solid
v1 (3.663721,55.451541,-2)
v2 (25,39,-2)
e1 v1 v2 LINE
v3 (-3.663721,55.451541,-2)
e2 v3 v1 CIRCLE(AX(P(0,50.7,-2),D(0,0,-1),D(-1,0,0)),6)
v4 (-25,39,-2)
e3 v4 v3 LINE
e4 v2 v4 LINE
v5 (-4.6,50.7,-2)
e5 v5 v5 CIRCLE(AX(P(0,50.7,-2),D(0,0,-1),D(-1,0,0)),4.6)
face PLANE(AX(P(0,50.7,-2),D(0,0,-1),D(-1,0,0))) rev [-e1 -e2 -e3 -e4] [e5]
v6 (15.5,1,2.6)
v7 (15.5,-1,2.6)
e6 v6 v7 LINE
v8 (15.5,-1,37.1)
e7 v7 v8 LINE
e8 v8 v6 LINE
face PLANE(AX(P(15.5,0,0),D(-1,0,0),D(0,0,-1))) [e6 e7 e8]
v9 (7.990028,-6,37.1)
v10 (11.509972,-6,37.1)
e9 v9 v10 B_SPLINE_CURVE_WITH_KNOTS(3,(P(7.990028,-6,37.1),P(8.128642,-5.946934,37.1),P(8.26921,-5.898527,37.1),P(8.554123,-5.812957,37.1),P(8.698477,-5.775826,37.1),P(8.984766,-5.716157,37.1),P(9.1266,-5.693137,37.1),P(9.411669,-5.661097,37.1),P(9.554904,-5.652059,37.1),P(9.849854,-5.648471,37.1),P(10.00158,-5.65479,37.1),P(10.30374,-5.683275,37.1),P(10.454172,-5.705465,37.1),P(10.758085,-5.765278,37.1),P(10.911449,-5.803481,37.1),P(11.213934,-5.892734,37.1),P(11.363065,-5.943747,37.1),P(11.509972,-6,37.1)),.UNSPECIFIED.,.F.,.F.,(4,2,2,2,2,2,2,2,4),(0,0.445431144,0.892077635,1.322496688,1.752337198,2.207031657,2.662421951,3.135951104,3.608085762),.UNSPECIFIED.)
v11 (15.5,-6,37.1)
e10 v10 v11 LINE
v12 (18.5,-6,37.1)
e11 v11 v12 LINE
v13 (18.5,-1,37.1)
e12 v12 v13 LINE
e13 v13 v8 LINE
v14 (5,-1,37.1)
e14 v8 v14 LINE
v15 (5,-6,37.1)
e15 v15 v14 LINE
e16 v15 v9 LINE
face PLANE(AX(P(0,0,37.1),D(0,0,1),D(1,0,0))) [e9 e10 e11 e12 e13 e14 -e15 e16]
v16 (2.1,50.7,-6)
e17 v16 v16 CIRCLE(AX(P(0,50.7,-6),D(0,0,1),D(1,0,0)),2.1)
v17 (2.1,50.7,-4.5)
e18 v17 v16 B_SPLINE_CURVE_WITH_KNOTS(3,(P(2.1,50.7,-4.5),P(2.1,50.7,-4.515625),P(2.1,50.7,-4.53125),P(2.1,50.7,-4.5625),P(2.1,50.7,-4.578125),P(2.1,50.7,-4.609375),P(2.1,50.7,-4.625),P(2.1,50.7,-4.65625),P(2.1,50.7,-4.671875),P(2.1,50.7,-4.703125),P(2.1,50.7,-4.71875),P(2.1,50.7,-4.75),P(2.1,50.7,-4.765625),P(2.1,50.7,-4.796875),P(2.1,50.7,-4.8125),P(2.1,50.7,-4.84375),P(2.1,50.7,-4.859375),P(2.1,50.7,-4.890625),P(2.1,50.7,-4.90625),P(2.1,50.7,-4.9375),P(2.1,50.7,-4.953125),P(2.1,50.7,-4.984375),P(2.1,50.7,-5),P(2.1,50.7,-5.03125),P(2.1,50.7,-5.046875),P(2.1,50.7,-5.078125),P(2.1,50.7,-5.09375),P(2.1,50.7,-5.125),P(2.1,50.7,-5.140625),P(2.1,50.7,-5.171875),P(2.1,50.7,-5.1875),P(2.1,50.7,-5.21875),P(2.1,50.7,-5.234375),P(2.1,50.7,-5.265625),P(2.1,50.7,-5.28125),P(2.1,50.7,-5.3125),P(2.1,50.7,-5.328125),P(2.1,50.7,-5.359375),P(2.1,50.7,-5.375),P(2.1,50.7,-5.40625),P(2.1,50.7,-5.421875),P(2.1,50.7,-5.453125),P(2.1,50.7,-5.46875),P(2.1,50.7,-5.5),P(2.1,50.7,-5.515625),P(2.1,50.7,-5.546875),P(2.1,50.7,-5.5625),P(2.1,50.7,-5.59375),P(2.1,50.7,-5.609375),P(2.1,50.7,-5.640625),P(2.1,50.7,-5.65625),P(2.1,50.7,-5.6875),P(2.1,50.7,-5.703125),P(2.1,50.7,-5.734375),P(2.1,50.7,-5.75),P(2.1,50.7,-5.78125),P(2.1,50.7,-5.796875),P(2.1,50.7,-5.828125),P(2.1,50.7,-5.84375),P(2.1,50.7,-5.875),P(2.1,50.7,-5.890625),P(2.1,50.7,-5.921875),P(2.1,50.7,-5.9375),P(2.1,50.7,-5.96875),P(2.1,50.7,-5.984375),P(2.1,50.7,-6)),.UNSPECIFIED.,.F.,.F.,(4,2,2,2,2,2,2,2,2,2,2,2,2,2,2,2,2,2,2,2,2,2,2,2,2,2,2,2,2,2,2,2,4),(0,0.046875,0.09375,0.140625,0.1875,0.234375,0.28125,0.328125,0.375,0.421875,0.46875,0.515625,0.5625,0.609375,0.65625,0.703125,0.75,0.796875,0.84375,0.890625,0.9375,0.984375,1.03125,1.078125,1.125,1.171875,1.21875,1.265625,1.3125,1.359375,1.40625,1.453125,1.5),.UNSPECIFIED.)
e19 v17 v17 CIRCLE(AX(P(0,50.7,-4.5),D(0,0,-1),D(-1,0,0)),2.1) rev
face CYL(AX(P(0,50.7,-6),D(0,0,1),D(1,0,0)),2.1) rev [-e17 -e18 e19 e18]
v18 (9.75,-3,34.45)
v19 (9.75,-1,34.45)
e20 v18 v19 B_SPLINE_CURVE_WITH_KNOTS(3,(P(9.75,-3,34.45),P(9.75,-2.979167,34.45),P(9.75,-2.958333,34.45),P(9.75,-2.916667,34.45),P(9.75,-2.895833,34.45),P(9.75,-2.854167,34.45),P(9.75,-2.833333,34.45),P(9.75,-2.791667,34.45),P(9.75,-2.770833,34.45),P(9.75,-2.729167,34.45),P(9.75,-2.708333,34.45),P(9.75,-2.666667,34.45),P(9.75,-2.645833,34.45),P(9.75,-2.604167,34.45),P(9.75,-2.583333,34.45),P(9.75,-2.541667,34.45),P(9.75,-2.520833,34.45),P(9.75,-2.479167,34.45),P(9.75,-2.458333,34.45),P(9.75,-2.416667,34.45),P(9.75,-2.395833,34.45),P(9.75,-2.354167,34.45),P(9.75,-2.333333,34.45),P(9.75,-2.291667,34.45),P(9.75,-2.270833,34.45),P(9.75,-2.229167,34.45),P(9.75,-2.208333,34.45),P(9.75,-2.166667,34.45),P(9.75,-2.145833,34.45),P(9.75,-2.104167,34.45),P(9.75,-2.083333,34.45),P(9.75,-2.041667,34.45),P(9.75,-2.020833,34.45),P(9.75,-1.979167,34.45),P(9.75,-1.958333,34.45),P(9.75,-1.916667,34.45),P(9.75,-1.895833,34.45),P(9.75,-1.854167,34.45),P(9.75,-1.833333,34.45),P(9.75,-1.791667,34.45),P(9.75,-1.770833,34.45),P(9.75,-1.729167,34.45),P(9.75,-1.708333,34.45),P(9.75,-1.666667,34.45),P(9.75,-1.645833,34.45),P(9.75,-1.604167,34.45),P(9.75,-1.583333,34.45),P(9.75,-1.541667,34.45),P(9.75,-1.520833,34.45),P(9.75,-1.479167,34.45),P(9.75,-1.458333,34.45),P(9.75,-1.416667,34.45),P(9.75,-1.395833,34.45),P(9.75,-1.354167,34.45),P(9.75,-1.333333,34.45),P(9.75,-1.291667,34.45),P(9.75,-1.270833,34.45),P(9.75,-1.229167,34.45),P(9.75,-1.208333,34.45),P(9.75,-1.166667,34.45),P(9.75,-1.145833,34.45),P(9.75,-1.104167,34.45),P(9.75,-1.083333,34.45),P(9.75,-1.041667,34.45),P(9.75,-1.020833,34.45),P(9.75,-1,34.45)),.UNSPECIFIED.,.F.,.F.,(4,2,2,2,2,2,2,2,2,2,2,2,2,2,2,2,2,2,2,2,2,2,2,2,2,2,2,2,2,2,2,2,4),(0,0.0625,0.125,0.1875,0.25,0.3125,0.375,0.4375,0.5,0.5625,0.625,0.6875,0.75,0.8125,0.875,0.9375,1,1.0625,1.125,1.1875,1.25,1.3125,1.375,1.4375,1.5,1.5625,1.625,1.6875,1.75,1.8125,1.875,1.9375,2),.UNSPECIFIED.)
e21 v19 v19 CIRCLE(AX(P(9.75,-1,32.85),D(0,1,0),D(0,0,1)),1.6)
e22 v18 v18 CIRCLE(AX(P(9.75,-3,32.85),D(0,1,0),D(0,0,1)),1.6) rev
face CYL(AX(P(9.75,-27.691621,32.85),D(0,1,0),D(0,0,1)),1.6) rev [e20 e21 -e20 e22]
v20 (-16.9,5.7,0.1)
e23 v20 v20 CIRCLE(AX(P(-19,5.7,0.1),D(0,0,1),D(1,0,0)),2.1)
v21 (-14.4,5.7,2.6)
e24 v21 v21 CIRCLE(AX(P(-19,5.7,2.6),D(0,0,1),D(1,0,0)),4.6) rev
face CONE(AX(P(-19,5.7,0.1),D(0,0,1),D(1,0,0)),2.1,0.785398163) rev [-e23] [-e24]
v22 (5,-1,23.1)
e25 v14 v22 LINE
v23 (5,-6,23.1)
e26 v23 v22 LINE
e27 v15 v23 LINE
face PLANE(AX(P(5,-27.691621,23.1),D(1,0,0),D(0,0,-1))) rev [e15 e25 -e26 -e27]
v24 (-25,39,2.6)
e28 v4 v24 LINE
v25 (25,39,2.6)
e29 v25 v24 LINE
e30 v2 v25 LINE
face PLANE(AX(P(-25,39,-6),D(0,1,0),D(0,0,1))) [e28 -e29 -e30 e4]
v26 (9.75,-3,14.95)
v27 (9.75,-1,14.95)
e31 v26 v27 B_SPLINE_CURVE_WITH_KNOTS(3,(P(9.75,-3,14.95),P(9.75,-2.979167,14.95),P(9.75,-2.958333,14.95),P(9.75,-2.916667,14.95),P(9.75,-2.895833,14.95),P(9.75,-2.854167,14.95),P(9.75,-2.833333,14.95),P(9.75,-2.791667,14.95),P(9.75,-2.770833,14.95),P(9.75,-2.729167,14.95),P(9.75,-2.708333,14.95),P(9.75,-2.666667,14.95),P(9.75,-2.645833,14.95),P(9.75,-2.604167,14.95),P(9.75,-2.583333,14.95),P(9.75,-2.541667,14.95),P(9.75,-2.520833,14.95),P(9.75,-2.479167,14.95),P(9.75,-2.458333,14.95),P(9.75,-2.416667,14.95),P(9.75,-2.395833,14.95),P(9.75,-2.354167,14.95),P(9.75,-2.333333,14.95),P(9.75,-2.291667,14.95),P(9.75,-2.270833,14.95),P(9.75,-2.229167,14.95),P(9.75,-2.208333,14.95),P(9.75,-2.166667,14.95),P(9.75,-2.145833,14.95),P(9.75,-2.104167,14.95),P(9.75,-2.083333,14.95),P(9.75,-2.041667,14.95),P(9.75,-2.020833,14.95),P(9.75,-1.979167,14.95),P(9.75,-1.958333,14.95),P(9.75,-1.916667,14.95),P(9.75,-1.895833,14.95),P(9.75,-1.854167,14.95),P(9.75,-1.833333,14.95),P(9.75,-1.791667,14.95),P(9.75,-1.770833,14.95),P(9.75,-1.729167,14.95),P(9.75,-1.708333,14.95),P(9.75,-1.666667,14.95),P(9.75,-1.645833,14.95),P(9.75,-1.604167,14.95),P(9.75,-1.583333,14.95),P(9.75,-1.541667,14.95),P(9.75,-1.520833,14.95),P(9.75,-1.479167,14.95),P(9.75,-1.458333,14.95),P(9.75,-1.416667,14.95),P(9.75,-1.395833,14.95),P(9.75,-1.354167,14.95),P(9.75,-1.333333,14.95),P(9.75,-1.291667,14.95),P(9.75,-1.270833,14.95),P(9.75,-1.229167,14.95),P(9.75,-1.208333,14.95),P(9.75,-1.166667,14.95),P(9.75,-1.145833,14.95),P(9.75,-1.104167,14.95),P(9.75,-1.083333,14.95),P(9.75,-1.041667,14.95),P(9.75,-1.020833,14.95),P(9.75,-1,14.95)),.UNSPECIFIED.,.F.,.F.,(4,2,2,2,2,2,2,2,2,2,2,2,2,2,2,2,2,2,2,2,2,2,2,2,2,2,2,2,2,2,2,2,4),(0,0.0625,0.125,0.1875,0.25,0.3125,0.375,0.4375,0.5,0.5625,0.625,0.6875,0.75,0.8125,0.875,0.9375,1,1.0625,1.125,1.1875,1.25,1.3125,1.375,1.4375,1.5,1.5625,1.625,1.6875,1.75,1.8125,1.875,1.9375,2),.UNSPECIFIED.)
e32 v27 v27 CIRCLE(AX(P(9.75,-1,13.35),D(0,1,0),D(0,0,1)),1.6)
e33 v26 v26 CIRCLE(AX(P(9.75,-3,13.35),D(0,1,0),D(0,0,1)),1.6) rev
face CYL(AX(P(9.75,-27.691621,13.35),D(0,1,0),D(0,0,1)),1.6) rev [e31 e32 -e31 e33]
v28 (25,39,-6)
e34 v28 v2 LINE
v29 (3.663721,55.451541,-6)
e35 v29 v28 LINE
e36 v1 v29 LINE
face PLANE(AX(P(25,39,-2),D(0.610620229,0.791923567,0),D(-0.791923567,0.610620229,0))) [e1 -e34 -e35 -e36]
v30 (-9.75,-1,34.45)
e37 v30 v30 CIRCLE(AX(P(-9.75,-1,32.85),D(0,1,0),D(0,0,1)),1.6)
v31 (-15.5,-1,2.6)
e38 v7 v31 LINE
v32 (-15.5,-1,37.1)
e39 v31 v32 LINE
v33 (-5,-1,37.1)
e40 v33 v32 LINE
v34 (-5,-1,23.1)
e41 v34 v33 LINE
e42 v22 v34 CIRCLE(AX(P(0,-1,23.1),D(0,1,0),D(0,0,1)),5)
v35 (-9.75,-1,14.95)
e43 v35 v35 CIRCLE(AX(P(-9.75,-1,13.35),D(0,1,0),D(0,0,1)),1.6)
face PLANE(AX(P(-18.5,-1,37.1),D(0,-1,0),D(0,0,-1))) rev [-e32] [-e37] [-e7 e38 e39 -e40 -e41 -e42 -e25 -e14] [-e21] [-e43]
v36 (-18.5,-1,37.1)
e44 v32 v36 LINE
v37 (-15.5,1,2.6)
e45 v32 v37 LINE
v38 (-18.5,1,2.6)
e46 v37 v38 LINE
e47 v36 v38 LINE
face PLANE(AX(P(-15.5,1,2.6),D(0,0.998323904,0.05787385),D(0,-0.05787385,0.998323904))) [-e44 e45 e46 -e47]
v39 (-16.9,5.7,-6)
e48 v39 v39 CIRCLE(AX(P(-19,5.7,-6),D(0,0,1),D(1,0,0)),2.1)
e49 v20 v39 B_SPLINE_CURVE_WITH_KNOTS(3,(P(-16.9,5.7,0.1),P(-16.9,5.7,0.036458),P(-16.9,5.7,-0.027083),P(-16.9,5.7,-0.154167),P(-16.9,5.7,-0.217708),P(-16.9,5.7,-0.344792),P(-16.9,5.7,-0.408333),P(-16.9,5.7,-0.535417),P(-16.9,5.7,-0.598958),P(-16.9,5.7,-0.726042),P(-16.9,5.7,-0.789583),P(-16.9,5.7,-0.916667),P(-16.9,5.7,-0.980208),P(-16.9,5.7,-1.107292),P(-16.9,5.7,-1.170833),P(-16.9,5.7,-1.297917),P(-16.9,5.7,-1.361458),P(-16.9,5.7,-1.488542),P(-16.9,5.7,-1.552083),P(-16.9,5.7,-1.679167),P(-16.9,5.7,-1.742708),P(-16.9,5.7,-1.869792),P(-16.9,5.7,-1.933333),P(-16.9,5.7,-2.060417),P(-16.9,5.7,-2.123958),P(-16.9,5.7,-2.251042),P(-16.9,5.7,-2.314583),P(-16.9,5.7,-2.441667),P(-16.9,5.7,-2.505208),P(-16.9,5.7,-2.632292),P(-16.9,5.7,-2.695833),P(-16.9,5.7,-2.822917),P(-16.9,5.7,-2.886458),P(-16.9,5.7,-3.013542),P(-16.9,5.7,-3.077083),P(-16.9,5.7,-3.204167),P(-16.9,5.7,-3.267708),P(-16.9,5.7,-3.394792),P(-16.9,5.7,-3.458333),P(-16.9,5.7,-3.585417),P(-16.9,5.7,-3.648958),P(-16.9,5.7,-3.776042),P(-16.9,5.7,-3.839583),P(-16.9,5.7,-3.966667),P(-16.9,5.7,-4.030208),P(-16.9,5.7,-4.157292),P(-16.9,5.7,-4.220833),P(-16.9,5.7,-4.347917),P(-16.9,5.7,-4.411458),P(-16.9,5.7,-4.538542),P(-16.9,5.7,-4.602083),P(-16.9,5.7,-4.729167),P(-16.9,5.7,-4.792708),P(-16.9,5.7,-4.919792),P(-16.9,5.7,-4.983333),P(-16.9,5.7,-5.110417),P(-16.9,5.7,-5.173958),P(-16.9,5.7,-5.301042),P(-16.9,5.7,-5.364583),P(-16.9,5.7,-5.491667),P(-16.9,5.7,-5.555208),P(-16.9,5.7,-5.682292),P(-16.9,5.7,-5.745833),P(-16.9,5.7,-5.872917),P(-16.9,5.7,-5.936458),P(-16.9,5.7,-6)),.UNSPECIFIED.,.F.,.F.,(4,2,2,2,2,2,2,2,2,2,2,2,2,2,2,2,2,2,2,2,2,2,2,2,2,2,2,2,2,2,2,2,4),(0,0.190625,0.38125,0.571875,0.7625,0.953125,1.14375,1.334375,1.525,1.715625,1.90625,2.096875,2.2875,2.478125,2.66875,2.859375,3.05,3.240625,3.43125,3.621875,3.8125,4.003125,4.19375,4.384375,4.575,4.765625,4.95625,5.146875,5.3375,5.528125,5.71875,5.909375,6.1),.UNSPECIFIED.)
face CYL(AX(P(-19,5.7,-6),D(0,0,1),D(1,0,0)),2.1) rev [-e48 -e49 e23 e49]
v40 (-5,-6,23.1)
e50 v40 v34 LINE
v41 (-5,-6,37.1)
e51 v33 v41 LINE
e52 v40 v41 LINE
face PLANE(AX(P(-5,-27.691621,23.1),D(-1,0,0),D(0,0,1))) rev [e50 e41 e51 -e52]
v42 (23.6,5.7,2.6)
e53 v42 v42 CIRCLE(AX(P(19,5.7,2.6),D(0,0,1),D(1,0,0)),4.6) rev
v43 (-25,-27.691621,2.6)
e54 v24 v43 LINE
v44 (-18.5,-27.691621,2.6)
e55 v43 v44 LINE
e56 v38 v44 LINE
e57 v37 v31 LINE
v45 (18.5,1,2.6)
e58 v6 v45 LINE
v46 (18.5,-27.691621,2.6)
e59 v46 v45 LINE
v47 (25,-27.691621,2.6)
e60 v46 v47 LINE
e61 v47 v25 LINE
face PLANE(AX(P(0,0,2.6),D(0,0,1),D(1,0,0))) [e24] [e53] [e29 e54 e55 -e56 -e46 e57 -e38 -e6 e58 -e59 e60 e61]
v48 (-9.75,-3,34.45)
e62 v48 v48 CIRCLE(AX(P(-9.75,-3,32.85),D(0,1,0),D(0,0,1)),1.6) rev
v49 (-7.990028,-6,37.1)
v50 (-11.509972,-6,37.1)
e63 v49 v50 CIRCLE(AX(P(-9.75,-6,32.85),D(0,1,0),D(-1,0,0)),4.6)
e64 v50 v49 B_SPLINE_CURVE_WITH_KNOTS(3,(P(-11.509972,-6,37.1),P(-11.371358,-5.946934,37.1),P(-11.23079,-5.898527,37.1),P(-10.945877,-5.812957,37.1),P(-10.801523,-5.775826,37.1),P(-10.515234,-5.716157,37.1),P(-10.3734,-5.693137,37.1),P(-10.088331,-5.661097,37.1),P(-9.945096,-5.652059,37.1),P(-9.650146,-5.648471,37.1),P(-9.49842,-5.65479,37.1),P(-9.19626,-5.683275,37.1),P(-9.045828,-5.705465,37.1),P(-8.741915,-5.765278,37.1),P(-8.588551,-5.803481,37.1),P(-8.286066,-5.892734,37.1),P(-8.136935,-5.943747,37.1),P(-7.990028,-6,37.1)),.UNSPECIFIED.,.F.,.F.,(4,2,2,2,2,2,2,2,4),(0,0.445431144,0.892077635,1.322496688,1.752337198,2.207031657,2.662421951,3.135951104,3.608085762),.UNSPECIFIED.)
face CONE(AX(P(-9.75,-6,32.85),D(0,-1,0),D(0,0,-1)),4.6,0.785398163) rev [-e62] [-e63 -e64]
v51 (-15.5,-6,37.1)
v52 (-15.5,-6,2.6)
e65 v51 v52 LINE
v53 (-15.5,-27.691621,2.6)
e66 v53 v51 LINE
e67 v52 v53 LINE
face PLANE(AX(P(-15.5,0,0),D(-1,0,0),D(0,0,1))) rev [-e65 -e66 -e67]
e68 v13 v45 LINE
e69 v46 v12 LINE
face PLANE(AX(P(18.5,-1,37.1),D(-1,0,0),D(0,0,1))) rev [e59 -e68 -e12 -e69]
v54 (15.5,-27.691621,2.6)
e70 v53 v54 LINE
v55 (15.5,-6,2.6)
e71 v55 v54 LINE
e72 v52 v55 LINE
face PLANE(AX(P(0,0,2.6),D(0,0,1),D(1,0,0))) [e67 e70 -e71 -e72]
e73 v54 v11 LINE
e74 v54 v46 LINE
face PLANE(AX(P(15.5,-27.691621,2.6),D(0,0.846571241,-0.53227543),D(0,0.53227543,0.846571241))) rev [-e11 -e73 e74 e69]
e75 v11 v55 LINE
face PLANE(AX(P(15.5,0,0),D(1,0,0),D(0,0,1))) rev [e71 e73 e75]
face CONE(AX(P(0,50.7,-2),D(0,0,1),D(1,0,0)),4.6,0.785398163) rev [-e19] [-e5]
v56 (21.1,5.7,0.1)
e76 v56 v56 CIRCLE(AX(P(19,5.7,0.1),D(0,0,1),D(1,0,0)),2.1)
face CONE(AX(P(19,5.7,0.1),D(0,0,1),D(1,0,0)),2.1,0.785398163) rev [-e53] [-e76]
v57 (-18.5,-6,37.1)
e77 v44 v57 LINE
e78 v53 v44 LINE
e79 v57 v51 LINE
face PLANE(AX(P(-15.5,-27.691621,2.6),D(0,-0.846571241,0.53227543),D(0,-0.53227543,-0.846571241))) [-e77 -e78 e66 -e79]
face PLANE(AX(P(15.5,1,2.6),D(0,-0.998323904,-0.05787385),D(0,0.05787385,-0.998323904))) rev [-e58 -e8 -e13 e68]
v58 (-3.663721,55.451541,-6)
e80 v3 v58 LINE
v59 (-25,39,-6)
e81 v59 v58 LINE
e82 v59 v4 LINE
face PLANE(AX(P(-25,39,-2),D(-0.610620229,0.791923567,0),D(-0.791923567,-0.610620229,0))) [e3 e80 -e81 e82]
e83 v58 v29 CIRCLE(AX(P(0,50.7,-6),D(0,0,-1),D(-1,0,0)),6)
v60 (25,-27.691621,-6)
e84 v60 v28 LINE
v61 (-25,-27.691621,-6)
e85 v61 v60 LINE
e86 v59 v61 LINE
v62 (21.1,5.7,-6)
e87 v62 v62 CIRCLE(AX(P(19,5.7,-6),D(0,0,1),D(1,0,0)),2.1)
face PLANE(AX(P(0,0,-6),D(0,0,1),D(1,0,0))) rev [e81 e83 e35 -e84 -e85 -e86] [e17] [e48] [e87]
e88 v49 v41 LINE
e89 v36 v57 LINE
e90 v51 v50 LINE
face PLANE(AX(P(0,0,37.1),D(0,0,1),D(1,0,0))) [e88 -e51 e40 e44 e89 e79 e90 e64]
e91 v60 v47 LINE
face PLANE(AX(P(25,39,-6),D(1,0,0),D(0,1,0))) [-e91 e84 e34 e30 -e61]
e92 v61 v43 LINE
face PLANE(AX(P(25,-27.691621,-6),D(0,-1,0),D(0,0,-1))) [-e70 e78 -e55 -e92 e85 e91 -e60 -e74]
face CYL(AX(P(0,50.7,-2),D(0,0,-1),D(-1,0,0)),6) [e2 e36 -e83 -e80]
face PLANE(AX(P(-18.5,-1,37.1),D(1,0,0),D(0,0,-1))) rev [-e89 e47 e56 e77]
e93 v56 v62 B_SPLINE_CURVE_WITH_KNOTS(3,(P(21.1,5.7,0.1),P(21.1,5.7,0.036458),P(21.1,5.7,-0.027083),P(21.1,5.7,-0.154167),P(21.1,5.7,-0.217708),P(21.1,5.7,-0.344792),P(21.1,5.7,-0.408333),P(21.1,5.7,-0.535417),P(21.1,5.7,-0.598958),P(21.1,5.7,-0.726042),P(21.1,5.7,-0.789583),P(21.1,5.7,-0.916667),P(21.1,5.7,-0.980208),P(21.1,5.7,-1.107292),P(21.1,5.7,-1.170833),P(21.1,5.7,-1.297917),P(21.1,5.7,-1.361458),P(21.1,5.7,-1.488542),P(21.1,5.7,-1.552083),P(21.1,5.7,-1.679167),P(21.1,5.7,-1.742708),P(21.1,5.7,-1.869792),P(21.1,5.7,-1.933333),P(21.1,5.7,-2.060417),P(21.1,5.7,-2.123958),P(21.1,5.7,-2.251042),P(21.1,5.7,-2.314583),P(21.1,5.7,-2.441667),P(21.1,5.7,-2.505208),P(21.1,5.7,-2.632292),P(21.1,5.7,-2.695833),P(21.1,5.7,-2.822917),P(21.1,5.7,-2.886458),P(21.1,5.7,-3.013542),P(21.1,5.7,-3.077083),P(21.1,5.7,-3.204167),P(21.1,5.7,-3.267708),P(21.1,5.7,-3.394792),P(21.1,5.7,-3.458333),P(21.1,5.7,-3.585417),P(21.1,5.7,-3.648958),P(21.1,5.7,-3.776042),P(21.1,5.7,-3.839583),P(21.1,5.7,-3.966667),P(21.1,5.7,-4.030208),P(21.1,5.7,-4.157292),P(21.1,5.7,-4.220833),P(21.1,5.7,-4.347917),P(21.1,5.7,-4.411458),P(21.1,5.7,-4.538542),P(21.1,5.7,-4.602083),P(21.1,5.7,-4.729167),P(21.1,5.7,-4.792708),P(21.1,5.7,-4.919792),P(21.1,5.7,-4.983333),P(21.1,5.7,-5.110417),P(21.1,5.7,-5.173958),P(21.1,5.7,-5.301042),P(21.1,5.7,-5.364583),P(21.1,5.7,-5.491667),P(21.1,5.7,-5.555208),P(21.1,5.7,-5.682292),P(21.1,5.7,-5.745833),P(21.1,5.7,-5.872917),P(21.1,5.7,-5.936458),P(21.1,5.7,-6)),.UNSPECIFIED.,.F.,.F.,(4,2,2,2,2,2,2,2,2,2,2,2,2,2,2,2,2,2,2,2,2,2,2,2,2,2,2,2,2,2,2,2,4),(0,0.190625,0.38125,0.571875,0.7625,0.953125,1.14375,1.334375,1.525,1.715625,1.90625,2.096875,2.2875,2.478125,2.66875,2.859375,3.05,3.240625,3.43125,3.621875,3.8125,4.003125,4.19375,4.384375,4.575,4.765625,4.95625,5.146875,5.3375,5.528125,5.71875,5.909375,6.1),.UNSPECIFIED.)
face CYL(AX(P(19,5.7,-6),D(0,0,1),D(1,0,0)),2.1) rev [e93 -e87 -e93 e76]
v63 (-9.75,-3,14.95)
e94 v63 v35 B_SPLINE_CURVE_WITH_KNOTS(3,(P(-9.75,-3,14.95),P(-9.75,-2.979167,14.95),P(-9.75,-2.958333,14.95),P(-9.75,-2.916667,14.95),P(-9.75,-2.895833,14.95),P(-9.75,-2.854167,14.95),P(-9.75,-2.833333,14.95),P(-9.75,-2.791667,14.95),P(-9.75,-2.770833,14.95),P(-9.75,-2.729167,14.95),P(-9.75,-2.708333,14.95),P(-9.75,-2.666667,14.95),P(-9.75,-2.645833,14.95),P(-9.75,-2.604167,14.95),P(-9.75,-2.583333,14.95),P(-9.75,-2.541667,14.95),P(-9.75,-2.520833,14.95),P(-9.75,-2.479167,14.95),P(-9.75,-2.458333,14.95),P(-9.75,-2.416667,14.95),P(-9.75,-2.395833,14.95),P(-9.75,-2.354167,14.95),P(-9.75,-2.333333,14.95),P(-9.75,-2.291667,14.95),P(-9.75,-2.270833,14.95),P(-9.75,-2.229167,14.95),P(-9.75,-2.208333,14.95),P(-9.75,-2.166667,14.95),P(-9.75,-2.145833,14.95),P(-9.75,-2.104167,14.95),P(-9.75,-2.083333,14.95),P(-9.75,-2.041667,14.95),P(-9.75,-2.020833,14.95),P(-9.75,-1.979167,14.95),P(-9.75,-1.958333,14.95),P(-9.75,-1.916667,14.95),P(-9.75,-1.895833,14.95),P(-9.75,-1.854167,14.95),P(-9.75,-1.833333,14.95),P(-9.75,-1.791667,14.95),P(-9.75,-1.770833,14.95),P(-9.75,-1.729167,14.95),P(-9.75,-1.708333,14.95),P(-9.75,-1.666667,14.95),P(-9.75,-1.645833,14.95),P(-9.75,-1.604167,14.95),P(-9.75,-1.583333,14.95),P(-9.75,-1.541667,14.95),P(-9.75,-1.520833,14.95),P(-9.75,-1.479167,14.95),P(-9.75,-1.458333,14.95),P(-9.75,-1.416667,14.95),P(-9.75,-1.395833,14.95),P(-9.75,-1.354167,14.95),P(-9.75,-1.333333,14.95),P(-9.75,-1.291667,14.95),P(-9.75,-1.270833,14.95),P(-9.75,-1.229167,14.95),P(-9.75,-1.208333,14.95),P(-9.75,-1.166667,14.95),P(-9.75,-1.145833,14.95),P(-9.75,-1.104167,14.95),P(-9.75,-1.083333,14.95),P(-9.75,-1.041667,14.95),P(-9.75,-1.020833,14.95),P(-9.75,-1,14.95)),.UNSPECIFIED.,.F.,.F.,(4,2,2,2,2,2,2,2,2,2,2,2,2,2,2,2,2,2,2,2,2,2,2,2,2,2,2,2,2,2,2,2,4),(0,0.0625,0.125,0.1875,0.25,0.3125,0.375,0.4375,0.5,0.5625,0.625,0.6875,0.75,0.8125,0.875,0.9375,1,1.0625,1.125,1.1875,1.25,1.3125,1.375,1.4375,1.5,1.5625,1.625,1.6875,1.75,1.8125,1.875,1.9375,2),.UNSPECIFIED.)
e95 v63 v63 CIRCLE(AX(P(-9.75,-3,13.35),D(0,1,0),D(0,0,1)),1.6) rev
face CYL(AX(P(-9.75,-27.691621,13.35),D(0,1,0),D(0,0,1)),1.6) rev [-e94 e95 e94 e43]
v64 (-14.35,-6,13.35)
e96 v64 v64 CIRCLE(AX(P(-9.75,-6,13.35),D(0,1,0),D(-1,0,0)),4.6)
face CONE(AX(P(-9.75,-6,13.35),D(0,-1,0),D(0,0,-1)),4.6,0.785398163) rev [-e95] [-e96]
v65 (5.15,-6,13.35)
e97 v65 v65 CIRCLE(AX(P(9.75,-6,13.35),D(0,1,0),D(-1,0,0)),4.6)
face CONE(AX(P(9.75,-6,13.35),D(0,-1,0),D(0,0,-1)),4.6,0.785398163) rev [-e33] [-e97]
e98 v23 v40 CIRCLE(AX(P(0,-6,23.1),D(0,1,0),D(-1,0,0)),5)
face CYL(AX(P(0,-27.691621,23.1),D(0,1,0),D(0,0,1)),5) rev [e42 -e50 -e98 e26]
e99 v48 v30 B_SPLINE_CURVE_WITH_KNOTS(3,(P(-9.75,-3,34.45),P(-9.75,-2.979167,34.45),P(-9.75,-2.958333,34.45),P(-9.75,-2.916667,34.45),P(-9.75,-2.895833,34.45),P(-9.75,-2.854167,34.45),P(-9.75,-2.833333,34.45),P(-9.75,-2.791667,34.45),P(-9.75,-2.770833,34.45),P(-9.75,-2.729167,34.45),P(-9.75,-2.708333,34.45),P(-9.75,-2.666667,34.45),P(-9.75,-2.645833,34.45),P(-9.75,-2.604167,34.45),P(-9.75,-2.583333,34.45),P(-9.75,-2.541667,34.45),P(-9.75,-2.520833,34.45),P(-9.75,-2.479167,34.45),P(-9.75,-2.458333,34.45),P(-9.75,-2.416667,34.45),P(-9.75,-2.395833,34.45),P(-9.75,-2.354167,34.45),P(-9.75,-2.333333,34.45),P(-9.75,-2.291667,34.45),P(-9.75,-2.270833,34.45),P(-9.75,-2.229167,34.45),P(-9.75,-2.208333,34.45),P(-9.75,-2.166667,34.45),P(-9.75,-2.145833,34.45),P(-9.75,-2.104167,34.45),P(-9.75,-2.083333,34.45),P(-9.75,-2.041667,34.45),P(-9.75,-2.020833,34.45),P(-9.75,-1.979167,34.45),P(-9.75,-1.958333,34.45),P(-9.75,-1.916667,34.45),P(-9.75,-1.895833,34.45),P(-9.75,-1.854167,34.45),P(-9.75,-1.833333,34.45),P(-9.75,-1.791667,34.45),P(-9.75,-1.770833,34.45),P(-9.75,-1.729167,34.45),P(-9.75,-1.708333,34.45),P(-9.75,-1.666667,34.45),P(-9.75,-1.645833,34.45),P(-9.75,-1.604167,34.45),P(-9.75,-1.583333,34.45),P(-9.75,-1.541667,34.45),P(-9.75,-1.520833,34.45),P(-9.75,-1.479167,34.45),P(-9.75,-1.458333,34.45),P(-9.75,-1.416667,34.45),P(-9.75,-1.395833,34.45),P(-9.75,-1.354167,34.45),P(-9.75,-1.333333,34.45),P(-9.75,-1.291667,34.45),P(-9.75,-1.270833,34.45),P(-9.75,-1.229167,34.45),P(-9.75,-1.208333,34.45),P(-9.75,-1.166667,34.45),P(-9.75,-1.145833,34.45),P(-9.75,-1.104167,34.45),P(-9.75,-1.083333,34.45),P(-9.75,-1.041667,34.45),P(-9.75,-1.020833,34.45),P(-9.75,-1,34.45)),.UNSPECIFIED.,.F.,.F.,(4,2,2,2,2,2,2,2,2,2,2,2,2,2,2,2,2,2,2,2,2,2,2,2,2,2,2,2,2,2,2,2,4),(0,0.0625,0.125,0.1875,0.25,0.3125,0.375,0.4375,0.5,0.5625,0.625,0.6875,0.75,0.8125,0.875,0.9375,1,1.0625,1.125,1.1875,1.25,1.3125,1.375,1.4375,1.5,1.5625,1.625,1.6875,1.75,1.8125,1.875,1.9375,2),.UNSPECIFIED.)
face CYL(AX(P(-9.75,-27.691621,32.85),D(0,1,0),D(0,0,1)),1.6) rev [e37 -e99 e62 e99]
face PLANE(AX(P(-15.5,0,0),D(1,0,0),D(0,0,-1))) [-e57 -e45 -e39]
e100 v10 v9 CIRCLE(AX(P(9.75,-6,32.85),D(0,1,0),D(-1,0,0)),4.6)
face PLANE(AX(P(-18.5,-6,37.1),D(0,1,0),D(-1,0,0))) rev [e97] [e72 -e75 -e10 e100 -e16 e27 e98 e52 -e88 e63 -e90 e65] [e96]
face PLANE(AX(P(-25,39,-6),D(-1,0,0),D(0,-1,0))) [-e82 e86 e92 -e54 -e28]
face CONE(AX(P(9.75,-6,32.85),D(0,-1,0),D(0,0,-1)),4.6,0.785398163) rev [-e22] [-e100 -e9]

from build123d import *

# Parameters (mm, degrees)
BOSS_EXTRUDE1_DEPTH      = 2.6
BOSS_EXTRUDE1_DEPTH_BACK = 6
SKETCH3_W                = 50
SKETCH3_H                = 66.691620804
BOSS_EXTRUDE2_DEPTH      = 4
SKETCH8_R                = 2.1
CUT_EXTRUDE4_DEPTH       = 63.560770456
CHAMFER1_SIZE            = 2.5
SKETCH9_W                = 37
SKETCH9_H                = 5
BOSS_EXTRUDE3_DEPTH      = 34.5
SKETCH10_R               = 1.6
CUT_EXTRUDE5_DEPTH       = 74.011642907
BOSS_EXTRUDE4_DEPTH      = 3
CHAMFER2_SIZE            = 3


with BuildPart() as part:
    # Sketch3 → Boss-Extrude1 (new, two sides: drawn at the far end of the back side and taken through both)
    with BuildSketch(Plane.XY.offset(-BOSS_EXTRUDE1_DEPTH_BACK)):
        with Locations((0, 5.654189598)):
            Rectangle(SKETCH3_W, SKETCH3_H)
    extrude(amount=BOSS_EXTRUDE1_DEPTH + BOSS_EXTRUDE1_DEPTH_BACK)

    # Sketch7 → Boss-Extrude2 (add)
    with BuildSketch(Plane(origin=(0, 0, -6), x_dir=(-1, 0, 0), z_dir=(0, 0, -1))):
        with BuildLine():
            Line((-25, 39), (-3.663721376, 55.451541401))
            ThreePointArc((-3.663721376, 55.451541401), (0, 56.7), (3.663721376, 55.451541401))
            Line((3.663721376, 55.451541401), (25, 39))
            Line((25, 39), (-25, 39))
        make_face()
    extrude(amount=-BOSS_EXTRUDE2_DEPTH)

    # Sketch8 → Cut-Extrude4 (cut, through all)
    with BuildSketch(Plane.XY.offset(2.6)):
        with Locations((-19, 5.7)):
            Circle(SKETCH8_R)
        with Locations((19, 5.7)):
            Circle(SKETCH8_R)
        with Locations((0, 50.7)):
            Circle(SKETCH8_R)
    extrude(amount=-CUT_EXTRUDE4_DEPTH, mode=Mode.SUBTRACT)

    # Chamfer1
    chamfer1_edges = [part.edges().sort_by_distance(p)[0] for p in [
        (-21.1, 5.7, 2.6),
        (16.9, 5.7, 2.6),
        (-2.1, 50.7, -2),
    ]]
    chamfer(chamfer1_edges, length=CHAMFER1_SIZE)

    # Sketch9 → Boss-Extrude3 (add)
    with BuildSketch(Plane.XY.offset(2.6)):
        with Locations((0, -3.5)):
            Rectangle(SKETCH9_W, SKETCH9_H)
    extrude(amount=BOSS_EXTRUDE3_DEPTH)

    # Sketch10 → Cut-Extrude5 (cut, through all)
    with BuildSketch(Plane(origin=(0, -1, 0), x_dir=(1, 0, 0), z_dir=(0, 1, 0))):
        with Locations(Location((9.75, -13.35, 0), (0, 0, 270))):
            Circle(SKETCH10_R)
        with Locations(Location((9.75, -32.85, 0), (0, 0, 270))):
            Circle(SKETCH10_R)
        with Locations(Location((-9.75, -32.85, 0), (0, 0, 270))):
            Circle(SKETCH10_R)
        with Locations(Location((-9.75, -13.35, 0), (0, 0, 270))):
            Circle(SKETCH10_R)
        with BuildLine():
            Line((-5, -23.1), (-5, -37.1))
            Line((-5, -37.1), (5, -37.1))
            Line((5, -37.1), (5, -23.1))
            ThreePointArc((5, -23.1), (0, -18.1), (-5, -23.1))
        make_face()
    extrude(amount=-CUT_EXTRUDE5_DEPTH, mode=Mode.SUBTRACT)

    # Sketch11 → Boss-Extrude4 (add)
    with BuildSketch(Plane.ZY.offset(18.5)):
        Polygon((2.6, -1), (2.6, 1), (37.1, -1), align=None)
        Polygon((2.6, -6), (2.6, -27.691620804), (37.1, -6), align=None)
    boss_extrude4 = extrude(amount=-BOSS_EXTRUDE4_DEPTH)

    # Mirror1: Boss-Extrude4 across plane
    add(boss_extrude4.mirror(Plane(origin=(0, 0, 0), x_dir=(0, 0, 1), z_dir=(1, 0, 0))))

    # Chamfer2
    # the kernel refuses this chamfer: 3 mm, written as the material it takes off along each edge
    with BuildSketch(Plane(origin=(9.75, -6, 32.85), x_dir=(0, 0, 1), z_dir=(-1, 0, 0))) as chamfer2_piece_1:
        Polygon((1.6 + CHAMFER2_SIZE, 0), (1.6, CHAMFER2_SIZE), (1.6, 0), align=None)
    revolve(axis=Axis((9.75, -6, 32.85), (0, 1, 0)), mode=Mode.SUBTRACT)
    with BuildSketch(Plane(origin=(-9.75, -6, 32.85), x_dir=(0, 0, 1), z_dir=(-1, 0, 0))) as chamfer2_piece_2:
        Polygon((1.6 + CHAMFER2_SIZE, 0), (1.6, CHAMFER2_SIZE), (1.6, 0), align=None)
    revolve(axis=Axis((-9.75, -6, 32.85), (0, 1, 0)), mode=Mode.SUBTRACT)
    with BuildSketch(Plane(origin=(-9.75, -6, 13.35), x_dir=(0, 0, 1), z_dir=(-1, 0, 0))) as chamfer2_piece_3:
        Polygon((1.6 + CHAMFER2_SIZE, 0), (1.6, CHAMFER2_SIZE), (1.6, 0), align=None)
    revolve(axis=Axis((-9.75, -6, 13.35), (0, 1, 0)), mode=Mode.SUBTRACT)
    with BuildSketch(Plane(origin=(9.75, -6, 13.35), x_dir=(0, 0, 1), z_dir=(-1, 0, 0))) as chamfer2_piece_4:
        Polygon((1.6 + CHAMFER2_SIZE, 0), (1.6, CHAMFER2_SIZE), (1.6, 0), align=None)
    revolve(axis=Axis((9.75, -6, 13.35), (0, 1, 0)), mode=Mode.SUBTRACT)


solid = part.part
